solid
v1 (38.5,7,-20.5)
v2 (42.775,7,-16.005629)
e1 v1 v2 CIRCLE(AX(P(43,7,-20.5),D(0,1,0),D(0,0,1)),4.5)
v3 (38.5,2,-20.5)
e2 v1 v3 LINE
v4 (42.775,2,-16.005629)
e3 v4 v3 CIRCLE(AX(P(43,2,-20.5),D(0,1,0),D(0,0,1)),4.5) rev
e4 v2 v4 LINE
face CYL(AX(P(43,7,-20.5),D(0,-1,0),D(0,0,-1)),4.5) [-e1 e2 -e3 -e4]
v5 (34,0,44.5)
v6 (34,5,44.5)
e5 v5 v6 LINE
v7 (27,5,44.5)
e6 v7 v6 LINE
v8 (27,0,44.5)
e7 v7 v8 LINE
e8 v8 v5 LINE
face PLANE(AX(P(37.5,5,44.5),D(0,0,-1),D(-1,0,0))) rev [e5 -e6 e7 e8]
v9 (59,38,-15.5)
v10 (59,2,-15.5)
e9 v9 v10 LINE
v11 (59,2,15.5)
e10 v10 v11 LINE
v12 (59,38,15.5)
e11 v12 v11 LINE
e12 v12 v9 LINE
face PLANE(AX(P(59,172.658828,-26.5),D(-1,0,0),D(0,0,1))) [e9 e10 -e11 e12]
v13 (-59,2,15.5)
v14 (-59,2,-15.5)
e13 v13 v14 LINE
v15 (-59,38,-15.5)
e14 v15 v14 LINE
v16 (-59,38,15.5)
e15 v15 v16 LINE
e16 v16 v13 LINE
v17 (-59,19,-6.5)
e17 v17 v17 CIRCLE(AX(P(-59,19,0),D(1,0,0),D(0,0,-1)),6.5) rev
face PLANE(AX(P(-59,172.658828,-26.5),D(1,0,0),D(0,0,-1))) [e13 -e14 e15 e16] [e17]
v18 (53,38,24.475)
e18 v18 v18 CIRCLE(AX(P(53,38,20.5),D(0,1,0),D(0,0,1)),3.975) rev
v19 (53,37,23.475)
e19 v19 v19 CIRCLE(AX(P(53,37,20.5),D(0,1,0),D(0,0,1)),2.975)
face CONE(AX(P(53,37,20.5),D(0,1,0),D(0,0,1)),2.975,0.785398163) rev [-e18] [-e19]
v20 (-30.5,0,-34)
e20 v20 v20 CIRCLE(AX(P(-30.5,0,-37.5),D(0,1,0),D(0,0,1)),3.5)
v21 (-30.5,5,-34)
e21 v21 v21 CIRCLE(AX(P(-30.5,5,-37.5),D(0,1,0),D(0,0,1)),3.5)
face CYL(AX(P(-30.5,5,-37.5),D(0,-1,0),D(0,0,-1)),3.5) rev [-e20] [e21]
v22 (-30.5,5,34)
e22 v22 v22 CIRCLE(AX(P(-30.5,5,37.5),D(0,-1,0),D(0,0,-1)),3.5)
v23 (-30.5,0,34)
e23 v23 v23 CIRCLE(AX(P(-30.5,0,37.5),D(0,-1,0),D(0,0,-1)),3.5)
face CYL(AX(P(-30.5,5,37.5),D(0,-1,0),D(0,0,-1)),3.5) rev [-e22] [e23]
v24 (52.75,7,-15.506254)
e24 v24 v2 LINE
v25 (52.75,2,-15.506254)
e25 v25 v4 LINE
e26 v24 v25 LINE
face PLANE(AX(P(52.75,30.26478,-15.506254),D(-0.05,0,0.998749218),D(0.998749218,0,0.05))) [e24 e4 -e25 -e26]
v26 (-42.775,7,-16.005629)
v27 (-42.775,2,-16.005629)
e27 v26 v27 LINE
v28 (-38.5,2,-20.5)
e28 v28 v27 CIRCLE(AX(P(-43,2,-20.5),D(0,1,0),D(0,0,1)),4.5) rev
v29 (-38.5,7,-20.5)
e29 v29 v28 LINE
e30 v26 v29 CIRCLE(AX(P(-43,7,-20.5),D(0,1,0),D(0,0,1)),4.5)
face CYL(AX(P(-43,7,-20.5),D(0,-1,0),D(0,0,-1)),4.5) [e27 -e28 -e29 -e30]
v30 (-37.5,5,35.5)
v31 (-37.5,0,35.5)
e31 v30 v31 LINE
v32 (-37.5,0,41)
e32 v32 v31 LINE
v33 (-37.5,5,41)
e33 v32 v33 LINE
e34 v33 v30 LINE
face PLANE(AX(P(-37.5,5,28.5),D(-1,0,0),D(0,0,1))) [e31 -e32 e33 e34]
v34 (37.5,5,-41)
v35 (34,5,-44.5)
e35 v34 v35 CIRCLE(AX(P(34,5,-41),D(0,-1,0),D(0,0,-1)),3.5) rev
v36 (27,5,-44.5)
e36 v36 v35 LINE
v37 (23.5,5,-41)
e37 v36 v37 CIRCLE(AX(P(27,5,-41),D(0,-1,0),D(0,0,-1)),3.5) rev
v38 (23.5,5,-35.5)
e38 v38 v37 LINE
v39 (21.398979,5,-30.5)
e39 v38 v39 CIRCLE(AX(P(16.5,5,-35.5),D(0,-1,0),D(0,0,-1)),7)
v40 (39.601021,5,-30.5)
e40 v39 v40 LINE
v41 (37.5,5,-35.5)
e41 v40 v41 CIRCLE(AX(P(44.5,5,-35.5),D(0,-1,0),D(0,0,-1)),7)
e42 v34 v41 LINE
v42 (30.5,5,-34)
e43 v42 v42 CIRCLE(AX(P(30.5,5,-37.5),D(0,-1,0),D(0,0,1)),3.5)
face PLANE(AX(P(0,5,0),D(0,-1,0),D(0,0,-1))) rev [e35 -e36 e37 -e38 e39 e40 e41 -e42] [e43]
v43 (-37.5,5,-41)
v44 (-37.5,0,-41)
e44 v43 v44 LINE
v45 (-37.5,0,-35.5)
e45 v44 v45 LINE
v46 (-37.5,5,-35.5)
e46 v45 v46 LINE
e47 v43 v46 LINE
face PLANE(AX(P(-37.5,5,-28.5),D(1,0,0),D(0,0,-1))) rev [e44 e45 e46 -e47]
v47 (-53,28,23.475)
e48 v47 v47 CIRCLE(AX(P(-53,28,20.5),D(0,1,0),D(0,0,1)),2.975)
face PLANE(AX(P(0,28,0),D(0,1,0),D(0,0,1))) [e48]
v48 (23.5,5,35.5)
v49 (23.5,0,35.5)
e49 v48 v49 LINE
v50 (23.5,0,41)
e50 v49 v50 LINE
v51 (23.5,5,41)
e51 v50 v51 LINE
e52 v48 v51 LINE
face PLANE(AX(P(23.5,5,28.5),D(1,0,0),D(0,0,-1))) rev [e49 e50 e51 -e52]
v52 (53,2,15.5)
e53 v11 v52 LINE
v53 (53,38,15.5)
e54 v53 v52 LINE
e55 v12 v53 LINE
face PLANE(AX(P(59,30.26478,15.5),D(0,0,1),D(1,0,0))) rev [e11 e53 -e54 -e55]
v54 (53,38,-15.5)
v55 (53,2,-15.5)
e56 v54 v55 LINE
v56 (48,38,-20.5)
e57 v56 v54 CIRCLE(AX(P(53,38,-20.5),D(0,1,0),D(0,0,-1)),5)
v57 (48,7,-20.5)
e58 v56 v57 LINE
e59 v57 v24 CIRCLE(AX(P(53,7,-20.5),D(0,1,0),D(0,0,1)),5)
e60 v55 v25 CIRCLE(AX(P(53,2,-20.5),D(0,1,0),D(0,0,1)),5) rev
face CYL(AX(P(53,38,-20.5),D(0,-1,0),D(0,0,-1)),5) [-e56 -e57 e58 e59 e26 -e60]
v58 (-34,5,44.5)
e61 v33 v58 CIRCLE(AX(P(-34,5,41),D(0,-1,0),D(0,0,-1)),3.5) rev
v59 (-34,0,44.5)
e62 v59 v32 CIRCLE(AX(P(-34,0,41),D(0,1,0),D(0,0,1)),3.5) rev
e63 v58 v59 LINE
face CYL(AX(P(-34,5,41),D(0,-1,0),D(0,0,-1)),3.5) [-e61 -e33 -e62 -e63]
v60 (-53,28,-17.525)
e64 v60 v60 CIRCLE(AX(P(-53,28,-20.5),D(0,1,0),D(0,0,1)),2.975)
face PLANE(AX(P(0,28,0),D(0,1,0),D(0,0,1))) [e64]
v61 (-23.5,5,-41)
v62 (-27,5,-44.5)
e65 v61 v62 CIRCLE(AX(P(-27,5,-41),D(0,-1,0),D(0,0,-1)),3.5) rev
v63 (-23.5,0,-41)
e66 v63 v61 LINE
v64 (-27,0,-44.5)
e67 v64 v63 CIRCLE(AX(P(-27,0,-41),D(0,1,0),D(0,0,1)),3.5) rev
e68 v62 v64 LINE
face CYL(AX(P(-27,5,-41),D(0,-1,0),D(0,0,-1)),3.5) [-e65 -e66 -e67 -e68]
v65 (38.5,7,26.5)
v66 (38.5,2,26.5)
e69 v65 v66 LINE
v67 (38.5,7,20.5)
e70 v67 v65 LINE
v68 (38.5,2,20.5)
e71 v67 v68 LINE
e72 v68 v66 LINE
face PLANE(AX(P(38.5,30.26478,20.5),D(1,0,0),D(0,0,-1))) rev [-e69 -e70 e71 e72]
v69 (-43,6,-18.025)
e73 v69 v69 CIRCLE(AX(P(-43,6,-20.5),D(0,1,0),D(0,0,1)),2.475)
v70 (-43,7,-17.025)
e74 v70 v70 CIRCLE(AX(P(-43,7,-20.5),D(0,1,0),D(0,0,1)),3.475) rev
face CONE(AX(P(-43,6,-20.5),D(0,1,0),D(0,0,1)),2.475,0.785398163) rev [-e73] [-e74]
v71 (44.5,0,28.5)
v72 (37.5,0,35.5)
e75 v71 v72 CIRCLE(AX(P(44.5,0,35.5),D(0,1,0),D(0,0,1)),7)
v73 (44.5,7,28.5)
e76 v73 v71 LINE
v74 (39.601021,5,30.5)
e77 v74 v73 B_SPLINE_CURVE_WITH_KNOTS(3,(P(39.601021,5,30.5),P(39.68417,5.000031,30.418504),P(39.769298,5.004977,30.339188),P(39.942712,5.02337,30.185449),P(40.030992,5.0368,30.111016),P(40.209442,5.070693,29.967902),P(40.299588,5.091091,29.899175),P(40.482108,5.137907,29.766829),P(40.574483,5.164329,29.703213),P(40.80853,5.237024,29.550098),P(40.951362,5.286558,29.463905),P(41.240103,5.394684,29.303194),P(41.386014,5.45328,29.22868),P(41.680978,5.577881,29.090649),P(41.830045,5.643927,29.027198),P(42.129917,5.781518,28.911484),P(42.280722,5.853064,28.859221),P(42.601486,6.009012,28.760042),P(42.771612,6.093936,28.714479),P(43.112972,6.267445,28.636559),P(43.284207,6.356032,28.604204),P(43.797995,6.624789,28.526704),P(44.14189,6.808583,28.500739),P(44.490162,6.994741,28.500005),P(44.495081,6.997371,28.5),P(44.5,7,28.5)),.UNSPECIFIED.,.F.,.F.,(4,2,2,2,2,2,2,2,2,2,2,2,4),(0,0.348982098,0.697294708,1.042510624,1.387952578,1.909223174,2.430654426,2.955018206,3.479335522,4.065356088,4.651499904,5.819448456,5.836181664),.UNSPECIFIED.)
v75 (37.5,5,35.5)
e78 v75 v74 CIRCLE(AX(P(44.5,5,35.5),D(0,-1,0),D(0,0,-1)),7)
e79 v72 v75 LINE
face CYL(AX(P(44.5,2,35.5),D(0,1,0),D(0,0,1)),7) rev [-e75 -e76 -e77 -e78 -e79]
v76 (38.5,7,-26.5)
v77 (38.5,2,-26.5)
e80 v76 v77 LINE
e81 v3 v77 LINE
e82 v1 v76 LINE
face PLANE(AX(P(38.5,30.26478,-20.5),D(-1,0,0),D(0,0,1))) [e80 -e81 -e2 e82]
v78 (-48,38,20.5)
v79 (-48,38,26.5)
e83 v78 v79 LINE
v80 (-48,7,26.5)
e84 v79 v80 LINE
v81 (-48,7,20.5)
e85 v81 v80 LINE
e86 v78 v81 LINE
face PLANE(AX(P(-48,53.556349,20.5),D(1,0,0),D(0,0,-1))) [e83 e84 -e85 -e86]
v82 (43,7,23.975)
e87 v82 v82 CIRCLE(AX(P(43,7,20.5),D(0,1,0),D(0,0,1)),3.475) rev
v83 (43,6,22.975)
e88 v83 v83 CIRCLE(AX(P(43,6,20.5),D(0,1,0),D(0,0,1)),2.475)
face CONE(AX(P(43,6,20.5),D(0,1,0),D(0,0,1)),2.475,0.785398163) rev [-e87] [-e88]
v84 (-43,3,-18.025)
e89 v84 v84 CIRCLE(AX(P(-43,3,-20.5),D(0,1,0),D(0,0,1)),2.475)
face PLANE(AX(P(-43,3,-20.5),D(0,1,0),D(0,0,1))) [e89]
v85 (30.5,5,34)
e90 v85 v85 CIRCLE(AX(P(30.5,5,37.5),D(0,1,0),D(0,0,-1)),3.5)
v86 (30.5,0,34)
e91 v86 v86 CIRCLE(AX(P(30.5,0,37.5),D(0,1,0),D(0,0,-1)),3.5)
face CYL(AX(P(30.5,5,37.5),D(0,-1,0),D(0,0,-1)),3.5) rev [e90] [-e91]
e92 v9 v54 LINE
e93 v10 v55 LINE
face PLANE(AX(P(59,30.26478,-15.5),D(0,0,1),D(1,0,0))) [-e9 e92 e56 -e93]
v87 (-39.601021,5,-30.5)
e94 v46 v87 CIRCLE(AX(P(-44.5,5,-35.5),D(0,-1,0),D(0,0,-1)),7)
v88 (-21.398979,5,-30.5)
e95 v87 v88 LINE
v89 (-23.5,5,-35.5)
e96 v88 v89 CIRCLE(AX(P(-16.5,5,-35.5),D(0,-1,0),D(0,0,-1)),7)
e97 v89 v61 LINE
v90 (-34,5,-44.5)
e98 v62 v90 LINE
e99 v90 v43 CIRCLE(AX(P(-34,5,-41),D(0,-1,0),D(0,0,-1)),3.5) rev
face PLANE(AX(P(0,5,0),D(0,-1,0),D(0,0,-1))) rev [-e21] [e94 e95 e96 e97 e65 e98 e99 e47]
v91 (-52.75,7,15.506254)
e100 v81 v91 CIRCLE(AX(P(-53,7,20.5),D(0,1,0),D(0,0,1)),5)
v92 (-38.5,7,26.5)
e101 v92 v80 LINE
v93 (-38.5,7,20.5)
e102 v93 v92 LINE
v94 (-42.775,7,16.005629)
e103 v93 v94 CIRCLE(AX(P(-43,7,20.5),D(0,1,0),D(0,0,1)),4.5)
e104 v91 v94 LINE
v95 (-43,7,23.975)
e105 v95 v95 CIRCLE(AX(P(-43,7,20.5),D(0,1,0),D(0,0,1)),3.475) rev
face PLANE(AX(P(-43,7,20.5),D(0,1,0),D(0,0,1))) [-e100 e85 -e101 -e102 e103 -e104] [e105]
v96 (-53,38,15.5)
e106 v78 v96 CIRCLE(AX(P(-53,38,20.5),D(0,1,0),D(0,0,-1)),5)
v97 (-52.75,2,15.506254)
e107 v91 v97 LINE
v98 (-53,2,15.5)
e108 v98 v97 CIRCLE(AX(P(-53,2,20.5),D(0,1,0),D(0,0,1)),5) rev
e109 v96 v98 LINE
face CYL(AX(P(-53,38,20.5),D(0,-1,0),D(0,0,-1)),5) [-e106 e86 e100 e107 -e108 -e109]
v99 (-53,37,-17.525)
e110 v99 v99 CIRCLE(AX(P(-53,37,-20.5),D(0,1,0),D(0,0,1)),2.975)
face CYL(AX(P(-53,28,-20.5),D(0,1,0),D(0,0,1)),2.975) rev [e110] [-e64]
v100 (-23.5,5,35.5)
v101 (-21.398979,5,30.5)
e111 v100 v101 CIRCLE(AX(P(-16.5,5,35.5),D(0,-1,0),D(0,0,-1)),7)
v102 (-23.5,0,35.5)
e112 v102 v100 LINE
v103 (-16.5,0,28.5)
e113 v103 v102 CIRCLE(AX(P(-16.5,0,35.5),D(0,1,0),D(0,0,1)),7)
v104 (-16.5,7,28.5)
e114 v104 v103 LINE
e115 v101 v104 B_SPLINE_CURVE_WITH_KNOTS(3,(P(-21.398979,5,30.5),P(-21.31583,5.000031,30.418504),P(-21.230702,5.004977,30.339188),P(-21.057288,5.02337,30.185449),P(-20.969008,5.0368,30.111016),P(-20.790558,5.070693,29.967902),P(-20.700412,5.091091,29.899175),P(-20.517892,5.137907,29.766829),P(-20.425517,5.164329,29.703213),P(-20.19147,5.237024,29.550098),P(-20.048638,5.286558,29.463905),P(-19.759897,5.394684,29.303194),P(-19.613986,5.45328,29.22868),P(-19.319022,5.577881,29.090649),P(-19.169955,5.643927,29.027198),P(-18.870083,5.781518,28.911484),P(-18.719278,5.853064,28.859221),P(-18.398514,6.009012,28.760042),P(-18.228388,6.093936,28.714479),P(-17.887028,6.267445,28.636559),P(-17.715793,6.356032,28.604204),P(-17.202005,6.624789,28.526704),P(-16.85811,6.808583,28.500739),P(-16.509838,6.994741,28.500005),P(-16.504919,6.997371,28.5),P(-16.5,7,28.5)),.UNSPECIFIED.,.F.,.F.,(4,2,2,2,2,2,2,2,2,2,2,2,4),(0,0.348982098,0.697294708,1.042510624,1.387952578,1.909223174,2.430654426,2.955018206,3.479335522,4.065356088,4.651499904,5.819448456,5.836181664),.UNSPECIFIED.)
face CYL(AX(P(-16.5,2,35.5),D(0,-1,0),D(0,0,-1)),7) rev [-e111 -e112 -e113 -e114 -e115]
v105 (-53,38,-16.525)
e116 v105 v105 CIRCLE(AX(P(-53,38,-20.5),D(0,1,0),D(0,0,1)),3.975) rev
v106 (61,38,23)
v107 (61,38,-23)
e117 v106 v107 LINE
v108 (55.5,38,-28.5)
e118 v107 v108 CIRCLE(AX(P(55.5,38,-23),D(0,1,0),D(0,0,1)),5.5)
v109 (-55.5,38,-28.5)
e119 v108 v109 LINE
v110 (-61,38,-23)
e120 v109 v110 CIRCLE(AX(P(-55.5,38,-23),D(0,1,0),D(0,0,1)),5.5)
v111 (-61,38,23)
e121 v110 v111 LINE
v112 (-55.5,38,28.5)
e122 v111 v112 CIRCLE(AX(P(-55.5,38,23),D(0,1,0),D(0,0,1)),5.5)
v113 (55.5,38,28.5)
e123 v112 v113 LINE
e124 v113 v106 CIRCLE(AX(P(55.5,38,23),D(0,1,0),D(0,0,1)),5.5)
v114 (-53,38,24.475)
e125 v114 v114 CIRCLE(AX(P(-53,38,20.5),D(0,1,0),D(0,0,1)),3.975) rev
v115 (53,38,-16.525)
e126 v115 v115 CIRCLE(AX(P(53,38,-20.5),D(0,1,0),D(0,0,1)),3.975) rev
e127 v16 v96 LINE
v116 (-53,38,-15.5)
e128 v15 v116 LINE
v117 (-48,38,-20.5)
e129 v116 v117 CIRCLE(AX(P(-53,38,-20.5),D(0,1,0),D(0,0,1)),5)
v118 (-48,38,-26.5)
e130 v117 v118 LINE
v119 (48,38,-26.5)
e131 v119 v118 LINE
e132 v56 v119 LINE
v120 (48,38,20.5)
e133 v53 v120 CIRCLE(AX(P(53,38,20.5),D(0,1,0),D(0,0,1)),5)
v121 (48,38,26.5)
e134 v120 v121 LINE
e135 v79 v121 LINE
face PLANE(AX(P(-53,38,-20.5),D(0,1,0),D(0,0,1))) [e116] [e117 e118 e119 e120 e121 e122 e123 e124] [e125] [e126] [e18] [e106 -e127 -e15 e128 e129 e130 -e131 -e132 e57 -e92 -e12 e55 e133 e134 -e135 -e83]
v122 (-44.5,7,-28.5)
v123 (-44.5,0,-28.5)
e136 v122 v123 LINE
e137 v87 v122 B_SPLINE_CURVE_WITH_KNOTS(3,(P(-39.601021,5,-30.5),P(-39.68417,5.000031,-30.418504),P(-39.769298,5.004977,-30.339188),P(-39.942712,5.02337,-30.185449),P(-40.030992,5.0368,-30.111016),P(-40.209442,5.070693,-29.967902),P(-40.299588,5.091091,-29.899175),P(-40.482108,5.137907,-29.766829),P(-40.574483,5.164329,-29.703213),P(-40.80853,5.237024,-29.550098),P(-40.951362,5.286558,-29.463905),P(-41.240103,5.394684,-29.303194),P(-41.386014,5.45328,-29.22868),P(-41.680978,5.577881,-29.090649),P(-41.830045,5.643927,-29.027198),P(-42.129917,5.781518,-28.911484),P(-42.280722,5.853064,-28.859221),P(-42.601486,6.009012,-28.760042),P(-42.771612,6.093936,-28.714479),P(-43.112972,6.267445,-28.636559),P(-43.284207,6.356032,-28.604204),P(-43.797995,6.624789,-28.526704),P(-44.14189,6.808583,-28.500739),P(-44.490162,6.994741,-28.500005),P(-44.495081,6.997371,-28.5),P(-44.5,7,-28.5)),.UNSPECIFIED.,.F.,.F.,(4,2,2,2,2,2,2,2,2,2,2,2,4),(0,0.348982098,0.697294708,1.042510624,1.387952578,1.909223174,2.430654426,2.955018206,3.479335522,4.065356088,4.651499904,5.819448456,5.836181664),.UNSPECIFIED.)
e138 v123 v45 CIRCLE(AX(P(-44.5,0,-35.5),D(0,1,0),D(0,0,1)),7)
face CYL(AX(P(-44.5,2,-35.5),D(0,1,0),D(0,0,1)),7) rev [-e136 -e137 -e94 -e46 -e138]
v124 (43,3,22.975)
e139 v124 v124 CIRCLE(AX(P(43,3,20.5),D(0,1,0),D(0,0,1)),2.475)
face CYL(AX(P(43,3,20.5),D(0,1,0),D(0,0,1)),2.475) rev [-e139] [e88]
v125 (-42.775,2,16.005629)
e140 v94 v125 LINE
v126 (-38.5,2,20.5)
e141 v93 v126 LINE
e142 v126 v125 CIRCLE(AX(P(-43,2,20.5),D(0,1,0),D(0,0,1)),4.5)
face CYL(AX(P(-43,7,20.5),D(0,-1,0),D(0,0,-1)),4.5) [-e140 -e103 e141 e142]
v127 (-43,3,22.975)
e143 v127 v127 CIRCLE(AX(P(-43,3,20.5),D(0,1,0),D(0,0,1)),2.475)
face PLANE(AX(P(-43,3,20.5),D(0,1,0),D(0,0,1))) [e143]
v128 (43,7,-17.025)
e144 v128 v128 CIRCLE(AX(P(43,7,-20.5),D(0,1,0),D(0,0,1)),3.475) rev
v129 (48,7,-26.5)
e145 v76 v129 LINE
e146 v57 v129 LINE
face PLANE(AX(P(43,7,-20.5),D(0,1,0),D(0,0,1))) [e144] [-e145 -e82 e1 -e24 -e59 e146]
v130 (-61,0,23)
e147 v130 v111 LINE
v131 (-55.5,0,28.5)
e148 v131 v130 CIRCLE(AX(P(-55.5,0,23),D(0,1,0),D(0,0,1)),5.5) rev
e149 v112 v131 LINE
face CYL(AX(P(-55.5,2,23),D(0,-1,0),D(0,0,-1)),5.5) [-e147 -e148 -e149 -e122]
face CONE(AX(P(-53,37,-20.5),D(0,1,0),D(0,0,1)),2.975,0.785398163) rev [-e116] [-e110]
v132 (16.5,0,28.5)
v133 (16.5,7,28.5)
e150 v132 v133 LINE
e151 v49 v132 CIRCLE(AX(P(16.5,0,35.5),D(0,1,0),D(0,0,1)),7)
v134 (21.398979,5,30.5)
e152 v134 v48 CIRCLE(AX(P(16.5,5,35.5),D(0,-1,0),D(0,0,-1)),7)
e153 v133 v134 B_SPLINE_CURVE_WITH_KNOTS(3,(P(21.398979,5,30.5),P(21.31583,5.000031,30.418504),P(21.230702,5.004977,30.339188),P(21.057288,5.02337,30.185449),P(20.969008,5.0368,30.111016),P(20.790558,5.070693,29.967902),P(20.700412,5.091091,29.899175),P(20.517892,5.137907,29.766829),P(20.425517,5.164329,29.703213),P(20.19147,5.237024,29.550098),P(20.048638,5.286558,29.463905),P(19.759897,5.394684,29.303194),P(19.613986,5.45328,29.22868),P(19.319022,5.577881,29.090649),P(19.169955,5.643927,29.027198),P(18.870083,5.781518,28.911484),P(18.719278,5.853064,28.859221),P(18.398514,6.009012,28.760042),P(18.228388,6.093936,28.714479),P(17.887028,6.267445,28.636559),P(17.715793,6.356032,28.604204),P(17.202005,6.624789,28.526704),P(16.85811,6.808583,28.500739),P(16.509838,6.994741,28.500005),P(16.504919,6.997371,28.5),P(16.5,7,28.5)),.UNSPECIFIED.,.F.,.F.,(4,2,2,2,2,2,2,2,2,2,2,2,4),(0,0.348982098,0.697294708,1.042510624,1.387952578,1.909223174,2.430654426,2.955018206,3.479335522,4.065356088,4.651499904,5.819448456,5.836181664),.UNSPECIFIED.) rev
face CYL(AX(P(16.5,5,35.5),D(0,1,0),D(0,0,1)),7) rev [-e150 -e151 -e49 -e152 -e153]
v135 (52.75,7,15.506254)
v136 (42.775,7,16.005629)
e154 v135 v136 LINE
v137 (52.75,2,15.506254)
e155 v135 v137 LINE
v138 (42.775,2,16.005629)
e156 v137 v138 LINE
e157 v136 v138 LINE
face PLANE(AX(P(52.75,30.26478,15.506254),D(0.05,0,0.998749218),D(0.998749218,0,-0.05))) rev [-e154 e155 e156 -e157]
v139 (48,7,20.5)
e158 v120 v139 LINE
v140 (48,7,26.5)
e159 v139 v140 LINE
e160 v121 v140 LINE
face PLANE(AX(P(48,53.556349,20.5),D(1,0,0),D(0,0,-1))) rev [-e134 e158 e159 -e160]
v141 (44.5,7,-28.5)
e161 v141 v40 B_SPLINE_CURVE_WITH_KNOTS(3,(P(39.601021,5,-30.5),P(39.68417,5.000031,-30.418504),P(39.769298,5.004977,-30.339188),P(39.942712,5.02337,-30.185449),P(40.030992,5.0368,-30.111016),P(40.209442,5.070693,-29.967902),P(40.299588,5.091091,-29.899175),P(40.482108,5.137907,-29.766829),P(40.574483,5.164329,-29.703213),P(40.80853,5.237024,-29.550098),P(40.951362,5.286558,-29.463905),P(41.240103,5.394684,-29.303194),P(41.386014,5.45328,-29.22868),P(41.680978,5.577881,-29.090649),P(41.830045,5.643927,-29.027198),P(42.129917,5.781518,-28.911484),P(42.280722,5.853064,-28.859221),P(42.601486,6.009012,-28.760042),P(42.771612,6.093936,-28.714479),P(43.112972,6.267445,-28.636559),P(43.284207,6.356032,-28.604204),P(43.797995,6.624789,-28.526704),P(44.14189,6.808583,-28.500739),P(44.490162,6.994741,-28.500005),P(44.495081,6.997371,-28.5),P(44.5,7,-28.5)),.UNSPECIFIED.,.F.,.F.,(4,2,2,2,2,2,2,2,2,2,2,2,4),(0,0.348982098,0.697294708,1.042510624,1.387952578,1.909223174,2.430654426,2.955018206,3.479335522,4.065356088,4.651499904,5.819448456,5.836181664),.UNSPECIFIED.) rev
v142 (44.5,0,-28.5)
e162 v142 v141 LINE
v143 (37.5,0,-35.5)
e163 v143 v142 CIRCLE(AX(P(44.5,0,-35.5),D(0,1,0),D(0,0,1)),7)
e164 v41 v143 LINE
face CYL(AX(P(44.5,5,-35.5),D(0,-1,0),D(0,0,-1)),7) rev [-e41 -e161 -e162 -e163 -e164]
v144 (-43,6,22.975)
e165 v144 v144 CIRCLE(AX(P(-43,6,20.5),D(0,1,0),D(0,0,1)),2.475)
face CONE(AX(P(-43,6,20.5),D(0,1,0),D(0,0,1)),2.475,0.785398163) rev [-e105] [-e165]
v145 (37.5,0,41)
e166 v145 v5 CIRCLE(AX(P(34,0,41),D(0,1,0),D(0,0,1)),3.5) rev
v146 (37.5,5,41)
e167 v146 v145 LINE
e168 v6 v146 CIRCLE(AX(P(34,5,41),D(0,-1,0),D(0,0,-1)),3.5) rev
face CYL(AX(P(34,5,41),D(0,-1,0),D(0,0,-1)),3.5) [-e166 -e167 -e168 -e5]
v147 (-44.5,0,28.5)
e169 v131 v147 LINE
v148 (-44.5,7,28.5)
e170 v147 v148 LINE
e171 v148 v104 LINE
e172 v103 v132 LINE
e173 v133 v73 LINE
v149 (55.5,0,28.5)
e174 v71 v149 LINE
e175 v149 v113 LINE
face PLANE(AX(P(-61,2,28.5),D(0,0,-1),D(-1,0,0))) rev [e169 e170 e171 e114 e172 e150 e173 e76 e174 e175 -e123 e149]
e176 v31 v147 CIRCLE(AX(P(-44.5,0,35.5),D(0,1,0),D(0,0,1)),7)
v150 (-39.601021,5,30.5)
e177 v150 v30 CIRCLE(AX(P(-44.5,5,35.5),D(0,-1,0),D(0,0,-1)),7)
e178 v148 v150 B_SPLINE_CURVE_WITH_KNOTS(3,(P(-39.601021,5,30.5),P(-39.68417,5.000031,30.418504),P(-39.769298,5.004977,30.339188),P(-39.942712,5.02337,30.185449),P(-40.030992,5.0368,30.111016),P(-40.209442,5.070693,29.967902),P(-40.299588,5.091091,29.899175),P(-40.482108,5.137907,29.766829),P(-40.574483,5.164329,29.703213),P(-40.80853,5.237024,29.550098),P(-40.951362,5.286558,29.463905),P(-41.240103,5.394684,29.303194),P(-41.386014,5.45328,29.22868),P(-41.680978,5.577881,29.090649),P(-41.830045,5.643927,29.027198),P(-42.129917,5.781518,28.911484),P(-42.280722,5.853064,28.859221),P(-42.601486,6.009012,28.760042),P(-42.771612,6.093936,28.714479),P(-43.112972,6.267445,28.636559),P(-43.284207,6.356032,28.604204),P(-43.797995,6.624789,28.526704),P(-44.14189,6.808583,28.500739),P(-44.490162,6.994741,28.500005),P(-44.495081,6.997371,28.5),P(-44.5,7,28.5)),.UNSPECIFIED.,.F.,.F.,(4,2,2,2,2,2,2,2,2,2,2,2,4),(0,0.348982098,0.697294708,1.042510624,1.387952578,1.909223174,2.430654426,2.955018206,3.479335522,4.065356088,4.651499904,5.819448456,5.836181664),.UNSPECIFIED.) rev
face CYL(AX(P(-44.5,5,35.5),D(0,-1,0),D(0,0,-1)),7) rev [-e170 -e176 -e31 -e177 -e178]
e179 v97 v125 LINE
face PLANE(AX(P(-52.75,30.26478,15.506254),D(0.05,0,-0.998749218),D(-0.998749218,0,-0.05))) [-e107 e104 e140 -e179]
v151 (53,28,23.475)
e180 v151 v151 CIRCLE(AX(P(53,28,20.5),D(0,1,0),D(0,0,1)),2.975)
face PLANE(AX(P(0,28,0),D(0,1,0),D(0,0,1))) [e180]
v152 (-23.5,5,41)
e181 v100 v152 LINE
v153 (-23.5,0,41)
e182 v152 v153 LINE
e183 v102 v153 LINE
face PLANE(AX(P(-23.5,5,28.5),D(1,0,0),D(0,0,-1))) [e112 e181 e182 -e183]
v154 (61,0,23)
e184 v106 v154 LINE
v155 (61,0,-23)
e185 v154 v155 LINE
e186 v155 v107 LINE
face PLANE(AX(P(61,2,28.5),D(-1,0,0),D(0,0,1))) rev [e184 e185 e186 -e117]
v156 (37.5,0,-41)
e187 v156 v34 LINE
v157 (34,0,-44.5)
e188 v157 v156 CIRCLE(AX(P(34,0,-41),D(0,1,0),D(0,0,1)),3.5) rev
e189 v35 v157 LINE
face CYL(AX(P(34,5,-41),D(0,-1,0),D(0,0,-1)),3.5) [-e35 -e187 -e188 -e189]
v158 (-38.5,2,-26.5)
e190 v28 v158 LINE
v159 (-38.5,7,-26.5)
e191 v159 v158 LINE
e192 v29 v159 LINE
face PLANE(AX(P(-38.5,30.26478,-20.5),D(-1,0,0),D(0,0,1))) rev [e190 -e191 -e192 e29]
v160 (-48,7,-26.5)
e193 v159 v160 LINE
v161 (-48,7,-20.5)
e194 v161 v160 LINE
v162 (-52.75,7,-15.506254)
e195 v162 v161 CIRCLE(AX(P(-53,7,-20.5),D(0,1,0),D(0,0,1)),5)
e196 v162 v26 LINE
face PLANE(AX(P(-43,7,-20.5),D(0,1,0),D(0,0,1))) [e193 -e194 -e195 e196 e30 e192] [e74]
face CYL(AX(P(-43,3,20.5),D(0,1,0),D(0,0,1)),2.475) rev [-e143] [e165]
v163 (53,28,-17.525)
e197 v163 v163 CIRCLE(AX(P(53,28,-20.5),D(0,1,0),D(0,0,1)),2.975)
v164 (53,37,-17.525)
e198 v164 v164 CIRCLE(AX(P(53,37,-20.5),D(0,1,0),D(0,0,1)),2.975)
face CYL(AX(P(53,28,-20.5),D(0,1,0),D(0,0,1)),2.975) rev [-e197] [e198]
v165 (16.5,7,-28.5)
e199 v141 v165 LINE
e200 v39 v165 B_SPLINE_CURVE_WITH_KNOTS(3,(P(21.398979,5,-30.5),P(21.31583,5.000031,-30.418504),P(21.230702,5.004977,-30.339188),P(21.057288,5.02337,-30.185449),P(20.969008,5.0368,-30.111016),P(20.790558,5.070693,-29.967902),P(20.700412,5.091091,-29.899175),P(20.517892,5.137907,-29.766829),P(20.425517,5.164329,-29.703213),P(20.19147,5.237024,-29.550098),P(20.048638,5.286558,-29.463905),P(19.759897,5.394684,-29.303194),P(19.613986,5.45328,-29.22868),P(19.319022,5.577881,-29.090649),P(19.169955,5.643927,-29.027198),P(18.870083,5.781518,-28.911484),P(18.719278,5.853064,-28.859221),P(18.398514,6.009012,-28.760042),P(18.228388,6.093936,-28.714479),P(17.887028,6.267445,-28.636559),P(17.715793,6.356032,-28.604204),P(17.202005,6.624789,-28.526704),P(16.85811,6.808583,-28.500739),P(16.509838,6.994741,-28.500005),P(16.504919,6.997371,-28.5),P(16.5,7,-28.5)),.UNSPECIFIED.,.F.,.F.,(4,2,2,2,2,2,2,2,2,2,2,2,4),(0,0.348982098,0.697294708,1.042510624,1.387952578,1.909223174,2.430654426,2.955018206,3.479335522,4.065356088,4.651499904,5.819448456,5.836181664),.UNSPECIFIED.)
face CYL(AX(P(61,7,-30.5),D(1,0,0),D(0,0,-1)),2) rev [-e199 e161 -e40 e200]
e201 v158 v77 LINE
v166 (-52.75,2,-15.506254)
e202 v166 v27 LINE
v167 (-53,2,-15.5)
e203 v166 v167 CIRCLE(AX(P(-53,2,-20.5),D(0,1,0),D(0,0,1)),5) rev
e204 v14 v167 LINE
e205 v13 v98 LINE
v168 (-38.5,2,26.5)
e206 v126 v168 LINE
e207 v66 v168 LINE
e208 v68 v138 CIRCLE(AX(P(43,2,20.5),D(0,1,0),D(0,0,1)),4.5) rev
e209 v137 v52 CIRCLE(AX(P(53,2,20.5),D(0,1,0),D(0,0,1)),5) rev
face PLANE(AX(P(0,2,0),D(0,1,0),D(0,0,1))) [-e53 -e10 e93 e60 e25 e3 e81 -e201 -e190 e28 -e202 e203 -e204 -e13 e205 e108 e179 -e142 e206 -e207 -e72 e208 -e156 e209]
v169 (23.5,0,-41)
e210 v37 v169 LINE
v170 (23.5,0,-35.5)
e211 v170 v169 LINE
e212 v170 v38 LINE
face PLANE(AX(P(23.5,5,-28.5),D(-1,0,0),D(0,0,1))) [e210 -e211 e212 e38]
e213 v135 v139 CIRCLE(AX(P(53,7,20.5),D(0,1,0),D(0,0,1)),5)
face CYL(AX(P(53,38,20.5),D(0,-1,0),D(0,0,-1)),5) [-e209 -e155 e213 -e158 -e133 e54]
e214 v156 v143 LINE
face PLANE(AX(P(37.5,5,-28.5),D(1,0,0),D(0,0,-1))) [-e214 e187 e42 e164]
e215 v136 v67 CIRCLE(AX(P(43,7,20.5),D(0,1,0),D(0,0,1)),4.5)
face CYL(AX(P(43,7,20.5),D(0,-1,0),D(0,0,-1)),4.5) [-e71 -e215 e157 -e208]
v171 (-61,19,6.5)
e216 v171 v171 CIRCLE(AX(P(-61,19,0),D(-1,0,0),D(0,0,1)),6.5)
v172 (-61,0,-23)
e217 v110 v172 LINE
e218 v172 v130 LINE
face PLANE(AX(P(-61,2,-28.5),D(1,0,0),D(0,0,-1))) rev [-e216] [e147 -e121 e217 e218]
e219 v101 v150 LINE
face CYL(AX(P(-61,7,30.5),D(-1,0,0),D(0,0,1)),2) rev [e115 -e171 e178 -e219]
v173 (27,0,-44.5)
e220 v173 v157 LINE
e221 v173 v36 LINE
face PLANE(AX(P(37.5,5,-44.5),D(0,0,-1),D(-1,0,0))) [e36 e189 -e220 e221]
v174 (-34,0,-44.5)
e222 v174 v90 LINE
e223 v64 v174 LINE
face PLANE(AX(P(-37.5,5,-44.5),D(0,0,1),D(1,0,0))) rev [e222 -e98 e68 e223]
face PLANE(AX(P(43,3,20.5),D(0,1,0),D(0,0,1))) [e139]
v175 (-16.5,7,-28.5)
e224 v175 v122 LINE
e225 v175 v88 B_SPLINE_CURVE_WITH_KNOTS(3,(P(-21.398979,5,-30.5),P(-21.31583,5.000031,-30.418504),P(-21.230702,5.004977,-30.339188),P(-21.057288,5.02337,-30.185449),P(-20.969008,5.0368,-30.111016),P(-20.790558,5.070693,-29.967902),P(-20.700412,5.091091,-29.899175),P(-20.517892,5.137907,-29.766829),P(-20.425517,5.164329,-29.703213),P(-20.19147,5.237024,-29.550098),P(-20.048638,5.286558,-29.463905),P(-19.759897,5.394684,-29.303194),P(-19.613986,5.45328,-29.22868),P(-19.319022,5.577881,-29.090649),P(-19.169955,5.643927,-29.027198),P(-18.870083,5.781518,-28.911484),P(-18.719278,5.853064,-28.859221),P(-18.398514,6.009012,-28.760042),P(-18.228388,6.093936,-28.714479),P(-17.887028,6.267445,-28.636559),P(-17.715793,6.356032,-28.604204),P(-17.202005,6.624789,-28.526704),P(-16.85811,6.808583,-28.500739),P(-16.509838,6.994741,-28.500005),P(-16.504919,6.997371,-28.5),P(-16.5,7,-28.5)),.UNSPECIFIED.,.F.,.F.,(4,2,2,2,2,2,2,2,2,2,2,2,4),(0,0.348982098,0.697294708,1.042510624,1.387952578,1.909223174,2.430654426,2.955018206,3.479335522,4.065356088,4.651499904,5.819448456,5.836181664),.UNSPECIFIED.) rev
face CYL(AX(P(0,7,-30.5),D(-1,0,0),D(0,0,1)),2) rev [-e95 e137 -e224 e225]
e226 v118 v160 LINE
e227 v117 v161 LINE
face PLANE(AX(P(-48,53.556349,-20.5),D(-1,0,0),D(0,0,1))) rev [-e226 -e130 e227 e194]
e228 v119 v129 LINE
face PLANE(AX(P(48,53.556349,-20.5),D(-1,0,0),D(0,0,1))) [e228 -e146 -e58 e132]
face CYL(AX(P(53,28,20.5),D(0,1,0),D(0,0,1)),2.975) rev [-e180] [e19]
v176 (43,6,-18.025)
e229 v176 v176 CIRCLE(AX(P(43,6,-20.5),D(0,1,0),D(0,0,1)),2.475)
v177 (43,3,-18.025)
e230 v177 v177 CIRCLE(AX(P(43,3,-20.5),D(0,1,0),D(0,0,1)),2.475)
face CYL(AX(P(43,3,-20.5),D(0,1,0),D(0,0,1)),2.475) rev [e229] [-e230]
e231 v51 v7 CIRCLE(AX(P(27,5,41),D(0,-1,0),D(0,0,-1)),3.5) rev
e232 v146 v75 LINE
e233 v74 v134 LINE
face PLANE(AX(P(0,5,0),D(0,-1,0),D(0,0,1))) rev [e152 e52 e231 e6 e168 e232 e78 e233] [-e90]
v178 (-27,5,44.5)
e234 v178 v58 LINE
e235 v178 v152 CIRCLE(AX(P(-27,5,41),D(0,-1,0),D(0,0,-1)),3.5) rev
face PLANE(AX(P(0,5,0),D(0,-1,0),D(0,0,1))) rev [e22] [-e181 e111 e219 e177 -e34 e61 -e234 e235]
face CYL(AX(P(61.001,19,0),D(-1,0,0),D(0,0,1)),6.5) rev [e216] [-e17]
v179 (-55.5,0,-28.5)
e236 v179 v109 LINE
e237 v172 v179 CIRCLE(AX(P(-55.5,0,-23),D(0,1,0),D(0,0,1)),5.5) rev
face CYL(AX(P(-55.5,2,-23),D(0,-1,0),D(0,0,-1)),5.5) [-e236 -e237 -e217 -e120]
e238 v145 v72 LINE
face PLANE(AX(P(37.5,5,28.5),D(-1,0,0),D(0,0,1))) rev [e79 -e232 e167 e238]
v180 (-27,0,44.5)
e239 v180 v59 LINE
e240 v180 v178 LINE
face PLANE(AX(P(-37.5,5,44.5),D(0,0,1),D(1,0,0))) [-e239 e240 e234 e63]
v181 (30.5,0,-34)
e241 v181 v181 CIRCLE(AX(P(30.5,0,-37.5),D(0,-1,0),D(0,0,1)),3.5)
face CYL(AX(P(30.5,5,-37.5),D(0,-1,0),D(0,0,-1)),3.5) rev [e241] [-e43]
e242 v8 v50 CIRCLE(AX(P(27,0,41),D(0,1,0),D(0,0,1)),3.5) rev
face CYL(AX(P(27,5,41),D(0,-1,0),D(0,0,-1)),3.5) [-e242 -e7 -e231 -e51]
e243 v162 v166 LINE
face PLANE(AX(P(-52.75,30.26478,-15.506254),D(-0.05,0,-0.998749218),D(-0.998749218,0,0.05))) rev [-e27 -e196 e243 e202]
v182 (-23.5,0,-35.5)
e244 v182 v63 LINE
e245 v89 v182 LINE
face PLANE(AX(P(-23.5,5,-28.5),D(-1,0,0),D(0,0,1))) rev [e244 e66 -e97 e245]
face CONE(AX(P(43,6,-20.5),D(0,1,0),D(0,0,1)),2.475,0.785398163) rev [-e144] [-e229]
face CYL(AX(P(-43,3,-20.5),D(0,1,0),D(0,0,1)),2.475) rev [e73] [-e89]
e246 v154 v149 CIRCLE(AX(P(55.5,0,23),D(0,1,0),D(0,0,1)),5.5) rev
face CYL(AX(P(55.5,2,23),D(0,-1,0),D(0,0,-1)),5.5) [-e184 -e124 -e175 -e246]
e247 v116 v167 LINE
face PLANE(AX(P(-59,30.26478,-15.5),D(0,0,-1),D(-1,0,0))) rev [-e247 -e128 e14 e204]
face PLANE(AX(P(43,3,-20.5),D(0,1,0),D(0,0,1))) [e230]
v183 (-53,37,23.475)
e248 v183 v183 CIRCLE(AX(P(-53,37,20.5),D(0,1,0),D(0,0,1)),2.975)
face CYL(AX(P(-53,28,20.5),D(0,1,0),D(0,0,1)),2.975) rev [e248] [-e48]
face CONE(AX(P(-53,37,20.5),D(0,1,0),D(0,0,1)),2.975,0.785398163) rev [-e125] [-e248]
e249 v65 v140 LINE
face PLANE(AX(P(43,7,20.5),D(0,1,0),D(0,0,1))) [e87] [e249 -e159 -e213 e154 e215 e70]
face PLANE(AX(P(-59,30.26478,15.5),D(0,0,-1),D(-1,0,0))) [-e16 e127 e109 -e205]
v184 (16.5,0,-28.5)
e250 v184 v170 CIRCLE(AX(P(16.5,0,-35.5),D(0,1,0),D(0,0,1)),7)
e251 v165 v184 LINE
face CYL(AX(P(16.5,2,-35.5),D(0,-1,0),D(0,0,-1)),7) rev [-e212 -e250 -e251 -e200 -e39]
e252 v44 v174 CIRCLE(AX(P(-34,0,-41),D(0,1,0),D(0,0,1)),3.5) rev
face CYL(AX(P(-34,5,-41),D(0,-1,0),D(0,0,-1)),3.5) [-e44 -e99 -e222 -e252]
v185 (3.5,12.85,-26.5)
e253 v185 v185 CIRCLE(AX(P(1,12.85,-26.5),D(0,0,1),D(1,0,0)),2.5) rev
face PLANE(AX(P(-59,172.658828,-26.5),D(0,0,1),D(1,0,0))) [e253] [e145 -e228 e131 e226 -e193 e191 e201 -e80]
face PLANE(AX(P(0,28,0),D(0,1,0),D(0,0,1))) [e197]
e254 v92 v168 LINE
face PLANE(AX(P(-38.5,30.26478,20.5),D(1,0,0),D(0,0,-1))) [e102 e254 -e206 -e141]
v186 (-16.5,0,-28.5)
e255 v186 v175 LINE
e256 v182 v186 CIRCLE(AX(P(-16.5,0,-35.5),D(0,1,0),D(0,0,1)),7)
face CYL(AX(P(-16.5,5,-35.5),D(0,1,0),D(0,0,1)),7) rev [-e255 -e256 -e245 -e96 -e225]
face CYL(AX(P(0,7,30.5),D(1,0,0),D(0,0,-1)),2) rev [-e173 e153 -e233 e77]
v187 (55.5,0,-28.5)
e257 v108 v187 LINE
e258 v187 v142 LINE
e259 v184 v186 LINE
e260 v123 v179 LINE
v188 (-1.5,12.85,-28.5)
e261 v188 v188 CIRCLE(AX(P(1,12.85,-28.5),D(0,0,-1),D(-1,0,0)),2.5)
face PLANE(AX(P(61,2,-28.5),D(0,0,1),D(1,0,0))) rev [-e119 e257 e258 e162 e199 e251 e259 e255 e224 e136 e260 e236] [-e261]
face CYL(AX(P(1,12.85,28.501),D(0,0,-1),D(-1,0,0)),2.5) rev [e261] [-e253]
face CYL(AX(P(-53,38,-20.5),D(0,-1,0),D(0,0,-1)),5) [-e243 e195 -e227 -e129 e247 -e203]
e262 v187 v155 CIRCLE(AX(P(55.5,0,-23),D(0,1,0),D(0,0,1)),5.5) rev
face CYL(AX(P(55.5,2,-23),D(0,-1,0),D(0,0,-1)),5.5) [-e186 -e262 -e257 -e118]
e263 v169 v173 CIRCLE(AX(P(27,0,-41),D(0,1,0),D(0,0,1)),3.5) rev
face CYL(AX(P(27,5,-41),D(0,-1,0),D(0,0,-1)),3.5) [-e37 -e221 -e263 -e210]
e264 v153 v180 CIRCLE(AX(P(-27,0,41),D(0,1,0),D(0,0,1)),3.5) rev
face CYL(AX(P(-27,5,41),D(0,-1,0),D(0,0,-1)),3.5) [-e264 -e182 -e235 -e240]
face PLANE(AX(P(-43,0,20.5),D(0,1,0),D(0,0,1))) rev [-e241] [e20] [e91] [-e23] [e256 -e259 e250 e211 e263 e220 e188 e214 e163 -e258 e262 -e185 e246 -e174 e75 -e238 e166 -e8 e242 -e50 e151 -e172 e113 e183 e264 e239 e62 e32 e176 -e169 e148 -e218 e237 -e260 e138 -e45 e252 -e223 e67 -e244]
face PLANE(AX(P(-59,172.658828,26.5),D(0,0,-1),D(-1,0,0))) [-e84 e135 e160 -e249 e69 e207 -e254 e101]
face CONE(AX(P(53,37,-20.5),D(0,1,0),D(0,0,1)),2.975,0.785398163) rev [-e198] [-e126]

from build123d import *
from build123d.topology import SkipClean

# Parameters (mm, degrees)
SKETCH1_R                 = 4.5
BOSS_EXTRUDE3_DEPTH       = 7
BOSS_EXTRUDE3_2_DEPTH     = 7
BOSS_EXTRUDE3_3_DEPTH     = 7
BOSS_EXTRUDE3_4_DEPTH     = 7
SKETCH7_R                 = 2.475
CUT_EXTRUDE1_DEPTH        = 4
SKETCH8_R                 = 5
BOSS_EXTRUDE5_DEPTH       = 38
BOSS_EXTRUDE5_2_DEPTH     = 38
BOSS_EXTRUDE5_3_DEPTH     = 38
BOSS_EXTRUDE5_4_DEPTH     = 38
SKETCH9_R                 = 2.975
CUT_EXTRUDE2_DEPTH        = 10
SKETCH10_W                = 122
SKETCH10_H                = 57
SKETCH10_W_2              = 118
SKETCH10_H_2              = 53
BOSS_EXTRUDE12_DEPTH      = 38
SKETCH15_W                = 122
SKETCH15_H                = 57
BOSS_EXTRUDE14_DEPTH      = 2
FILLET2_R                 = 5.5
BOSS_EXTRUDE15_START      = 5
SKETCH16_R                = 2.475
SKETCH16_R_2              = 2.975
BOSS_EXTRUDE15_DEPTH      = 5
BOSS_EXTRUDE16_START      = 31
SKETCH17_R                = 2.975
BOSS_EXTRUDE16_DEPTH      = 31
MIRROR2_START             = 5
MIRROR2_COPY_1_SKETCH_R   = 2.475
MIRROR2_COPY_1_SKETCH_R_2 = 2.975
MIRROR2_COPY_1_DEPTH      = 5
MIRROR2_START_2           = 31
MIRROR2_COPY_2_SKETCH_R   = 2.975
MIRROR2_COPY_2_DEPTH      = 31
CUT_EXTRUDE3_REACH        = 93.728
SKETCH18_R                = 2.5
CUT_EXTRUDE4_REACH        = 132.921
SKETCH19_R                = 6.5
SKETCH20_W                = 14
SKETCH20_H                = 16
SKETCH20_R                = 3.5
BOSS_EXTRUDE17_DEPTH      = 5
MIRROR8_COPY_1_SKETCH_W   = 14
MIRROR8_COPY_1_SKETCH_H   = 16
MIRROR8_COPY_1_SKETCH_R   = 3.5
MIRROR8_COPY_1_DEPTH      = 5
FILLET3_R                 = 2
FILLET4_R                 = 7
FILLET5_R                 = 3.5
CHAMFER1_SIZE             = 1


with BuildPart() as part:
    # Sketch1 → Boss-Extrude3 (new body)
    with BuildSketch(Plane(origin=(0, 0, 0), x_dir=(1, 0, 0), z_dir=(0, 1, 0))):
        with Locations(Location((-43, 20.5, 0), (0, 0, 270))):
            Circle(SKETCH1_R)
    extrude(amount=BOSS_EXTRUDE3_DEPTH)


with BuildPart() as body_2:
    # Sketch1 → Boss-Extrude3 2 (new body)
    with BuildSketch(Plane(origin=(0, 0, 0), x_dir=(1, 0, 0), z_dir=(0, 1, 0))):
        with Locations(Location((43, 20.5, 0), (0, 0, 270))):
            Circle(SKETCH1_R)
    extrude(amount=BOSS_EXTRUDE3_2_DEPTH)


with BuildPart() as body_3:
    # Sketch1 → Boss-Extrude3 3 (new body)
    with BuildSketch(Plane(origin=(0, 0, 0), x_dir=(1, 0, 0), z_dir=(0, 1, 0))):
        with Locations(Location((43, -20.5, 0), (0, 0, 270))):
            Circle(SKETCH1_R)
    extrude(amount=BOSS_EXTRUDE3_3_DEPTH)


with BuildPart() as body_4:
    # Sketch1 → Boss-Extrude3 4 (new body)
    with BuildSketch(Plane(origin=(0, 0, 0), x_dir=(1, 0, 0), z_dir=(0, 1, 0))):
        with Locations(Location((-43, -20.5, 0), (0, 0, 270))):
            Circle(SKETCH1_R)
    extrude(amount=BOSS_EXTRUDE3_4_DEPTH)


with BuildPart() as cut_extrude1_tool:
    # Sketch7 → Cut-Extrude1 (new body)
    with BuildSketch(Plane(origin=(0, 7, 0), x_dir=(1, 0, 0), z_dir=(0, 1, 0))):
        with Locations(Location((-43, 20.5, 0), (0, 0, 270))):
            Circle(SKETCH7_R)
        with Locations(Location((43, 20.5, 0), (0, 0, 270))):
            Circle(SKETCH7_R)
        with Locations(Location((43, -20.5, 0), (0, 0, 270))):
            Circle(SKETCH7_R)
        with Locations(Location((-43, -20.5, 0), (0, 0, 270))):
            Circle(SKETCH7_R)
    extrude(amount=-CUT_EXTRUDE1_DEPTH)


with BuildPart() as part_1:
    add(part.part)

    # Cut-Extrude1: cut by cut_extrude1_tool
    add(cut_extrude1_tool.part, mode=Mode.SUBTRACT)



with BuildPart() as body_2_1:
    add(body_2.part)

    # Cut-Extrude1: cut by cut_extrude1_tool
    add(cut_extrude1_tool.part, mode=Mode.SUBTRACT)


with BuildPart() as body_3_1:
    add(body_3.part)

    # Cut-Extrude1: cut by cut_extrude1_tool
    add(cut_extrude1_tool.part, mode=Mode.SUBTRACT)


with BuildPart() as body_4_1:
    add(body_4.part)

    # Cut-Extrude1: cut by cut_extrude1_tool
    add(cut_extrude1_tool.part, mode=Mode.SUBTRACT)


with BuildPart() as body_5:
    # Sketch8 → Boss-Extrude5 (new body)
    with BuildSketch(Plane(origin=(0, 0, 0), x_dir=(1, 0, 0), z_dir=(0, 1, 0))):
        with Locations(Location((-53, 20.5, 0), (0, 0, 270))):
            Circle(SKETCH8_R)
    extrude(amount=BOSS_EXTRUDE5_DEPTH)


with BuildPart() as body_6:
    # Sketch8 → Boss-Extrude5 2 (new body)
    with BuildSketch(Plane(origin=(0, 0, 0), x_dir=(1, 0, 0), z_dir=(0, 1, 0))):
        with Locations(Location((-53, -20.5, 0), (0, 0, 90))):
            Circle(SKETCH8_R)
    extrude(amount=BOSS_EXTRUDE5_2_DEPTH)


with BuildPart() as body_7:
    # Sketch8 → Boss-Extrude5 3 (new body)
    with BuildSketch(Plane(origin=(0, 0, 0), x_dir=(1, 0, 0), z_dir=(0, 1, 0))):
        with Locations(Location((53, -20.5, 0), (0, 0, 270))):
            Circle(SKETCH8_R)
    extrude(amount=BOSS_EXTRUDE5_3_DEPTH)


with BuildPart() as body_8:
    # Sketch8 → Boss-Extrude5 4 (new body)
    with BuildSketch(Plane(origin=(0, 0, 0), x_dir=(1, 0, 0), z_dir=(0, 1, 0))):
        with Locations(Location((53, 20.5, 0), (0, 0, 90))):
            Circle(SKETCH8_R)
    extrude(amount=BOSS_EXTRUDE5_4_DEPTH)


with BuildPart() as cut_extrude2_tool:
    # Sketch9 → Cut-Extrude2 (new body)
    with BuildSketch(Plane(origin=(0, 38, 0), x_dir=(1, 0, 0), z_dir=(0, 1, 0))):
        with Locations(Location((-53, 20.5, 0), (0, 0, 270))):
            Circle(SKETCH9_R)
        with Locations(Location((-53, -20.5, 0), (0, 0, 270))):
            Circle(SKETCH9_R)
        with Locations(Location((53, 20.5, 0), (0, 0, 270))):
            Circle(SKETCH9_R)
        with Locations(Location((53, -20.5, 0), (0, 0, 270))):
            Circle(SKETCH9_R)
    extrude(amount=-CUT_EXTRUDE2_DEPTH)


with BuildPart() as body_5_1:
    add(body_5.part)

    # Cut-Extrude2: cut by cut_extrude2_tool
    add(cut_extrude2_tool.part, mode=Mode.SUBTRACT)


with BuildPart() as body_6_1:
    add(body_6.part)

    # Cut-Extrude2: cut by cut_extrude2_tool
    add(cut_extrude2_tool.part, mode=Mode.SUBTRACT)


with BuildPart() as body_7_1:
    add(body_7.part)

    # Cut-Extrude2: cut by cut_extrude2_tool
    add(cut_extrude2_tool.part, mode=Mode.SUBTRACT)


with BuildPart() as body_8_1:
    add(body_8.part)

    # Cut-Extrude2: cut by cut_extrude2_tool
    add(cut_extrude2_tool.part, mode=Mode.SUBTRACT)


with BuildPart() as body_9:
    # Sketch10 → Boss-Extrude12 (new body)
    with BuildSketch(Plane(origin=(0, 0, 0), x_dir=(1, 0, 0), z_dir=(0, 1, 0))):
        Rectangle(SKETCH10_W, SKETCH10_H)
        Rectangle(SKETCH10_W_2, SKETCH10_H_2, mode=Mode.SUBTRACT)
    extrude(amount=BOSS_EXTRUDE12_DEPTH)


with BuildPart() as part_2:
    add(part_1.part)

    add(body_2_1.part)  # Boss-Extrude14 merges body 2

    add(body_3_1.part)  # Boss-Extrude14 merges body 3

    add(body_4_1.part)  # Boss-Extrude14 merges body 4

    add(body_5_1.part)  # Boss-Extrude14 merges body 5

    add(body_6_1.part)  # Boss-Extrude14 merges body 6

    add(body_7_1.part)  # Boss-Extrude14 merges body 7

    add(body_8_1.part)  # Boss-Extrude14 merges body 8

    add(body_9.part)  # Boss-Extrude14 merges body 9
    # Sketch15 → Boss-Extrude14 (add)
    with BuildSketch(Plane(origin=(0, 0, 0), x_dir=(1, 0, 0), z_dir=(0, 1, 0))):
        Rectangle(SKETCH15_W, SKETCH15_H)
    extrude(amount=BOSS_EXTRUDE14_DEPTH)

    # Fillet2
    fillet2_edges = [part_2.edges().sort_by_distance(p)[0] for p in [
        (-61, 19, 28.5),
        (61, 19, 28.5),
        (61, 19, -28.5),
        (-61, 19, -28.5),
        (-59, 20, -26.5),
        (59, 20, -26.5),
        (59, 20, 26.5),
        (-59, 20, 26.5),
    ]]
    fillet(fillet2_edges, radius=FILLET2_R)

    # Sketch16 → Boss-Extrude15 (add)
    with BuildSketch(Plane(origin=(0, 2, 0), x_dir=(1, 0, 0), z_dir=(0, 1, 0)).offset(BOSS_EXTRUDE15_START)):
        with BuildLine():
            Line((-59, 15.5), (-59, 21))
            ThreePointArc((-59, 21), (-57.389087297, 24.889087297), (-53.5, 26.5))
            Line((-53.5, 26.5), (-38.5, 26.5))
            Line((-38.5, 26.5), (-38.5, 20.5))
            ThreePointArc((-38.5, 20.5), (-39.739440232, 17.398589031), (-42.775, 16.00562852))
            Line((-42.775, 16.00562852), (-52.75, 15.506253911))
            ThreePointArc((-52.75, 15.506253911), (-52.874960895, 15.501563722), (-53, 15.5))
            Line((-53, 15.5), (-59, 15.5))
        make_face()
        with Locations(Location((-43, 20.5, 0), (0, 0, 270))):
            Circle(SKETCH16_R, mode=Mode.SUBTRACT)
        with Locations(Location((-53, 20.5, 0), (0, 0, 270))):
            Circle(SKETCH16_R_2, mode=Mode.SUBTRACT)
    boss_extrude15 = extrude(amount=-BOSS_EXTRUDE15_DEPTH)

    # Sketch17 → Boss-Extrude16 (add)
    with BuildSketch(Plane(origin=(0, 7, 0), x_dir=(1, 0, 0), z_dir=(0, 1, 0)).offset(BOSS_EXTRUDE16_START)):
        with BuildLine():
            Line((-59, 15.5), (-53, 15.5))
            ThreePointArc((-53, 15.5), (-49.464466094, 16.964466094), (-48, 20.5))
            Line((-48, 20.5), (-48, 26.5))
            Line((-48, 26.5), (-53.5, 26.5))
            ThreePointArc((-53.5, 26.5), (-57.389087297, 24.889087297), (-59, 21))
            Line((-59, 21), (-59, 15.5))
        make_face()
        with Locations(Location((-53, 20.5, 0), (0, 0, 270))):
            Circle(SKETCH17_R, mode=Mode.SUBTRACT)
    boss_extrude16 = extrude(amount=-BOSS_EXTRUDE16_DEPTH)

    # Mirror1: Boss-Extrude15, Boss-Extrude16 across plane
    with SkipClean():  # the faces are left unmerged after this step: merging them gives an invalid solid
        add(boss_extrude15.mirror(Plane(origin=(0, 0, 0), x_dir=(0, 0, 1), z_dir=(1, 0, 0))))
        add(boss_extrude16.mirror(Plane(origin=(0, 0, 0), x_dir=(0, 0, 1), z_dir=(1, 0, 0))))

    # Mirror2: Boss-Extrude15, Boss-Extrude16 across plane
    with SkipClean():  # the faces are left unmerged after this step: merging them gives an invalid solid
        add(boss_extrude15.mirror(Plane.XY))
        add(boss_extrude16.mirror(Plane.XY))

    # Mirror2 copy 1 sketch → Mirror2 copy 1 (add)
    with SkipClean():  # the faces are left unmerged after this step: merging them gives an invalid solid
        with BuildSketch(Plane(origin=(0, 2, 0), x_dir=(-1, 0, 0), z_dir=(0, 1, 0)).offset(MIRROR2_START)):
            with BuildLine():
                Line((-59, 15.5), (-59, 21))
                ThreePointArc((-59, 21), (-57.389087297, 24.889087297), (-53.5, 26.5))
                Line((-53.5, 26.5), (-38.5, 26.5))
                Line((-38.5, 26.5), (-38.5, 20.5))
                ThreePointArc((-38.5, 20.5), (-39.739440232, 17.398589031), (-42.775, 16.00562852))
                Line((-42.775, 16.00562852), (-52.75, 15.506253911))
                ThreePointArc((-52.75, 15.506253911), (-52.874960895, 15.501563722), (-53, 15.5))
                Line((-53, 15.5), (-59, 15.5))
            make_face()
            with Locations(Location((-43, 20.5, 0), (0, 0, 270))):
                Circle(MIRROR2_COPY_1_SKETCH_R, mode=Mode.SUBTRACT)
            with Locations(Location((-53, 20.5, 0), (0, 0, 270))):
                Circle(MIRROR2_COPY_1_SKETCH_R_2, mode=Mode.SUBTRACT)
        extrude(amount=-MIRROR2_COPY_1_DEPTH)

    # Mirror2 copy 2 sketch → Mirror2 copy 2 (add)
    with SkipClean():  # the faces are left unmerged after this step: merging them gives an invalid solid
        with BuildSketch(Plane(origin=(0, 7, 0), x_dir=(-1, 0, 0), z_dir=(0, 1, 0)).offset(MIRROR2_START_2)):
            with BuildLine():
                Line((-59, 15.5), (-53, 15.5))
                ThreePointArc((-53, 15.5), (-49.464466094, 16.964466094), (-48, 20.5))
                Line((-48, 20.5), (-48, 26.5))
                Line((-48, 26.5), (-53.5, 26.5))
                ThreePointArc((-53.5, 26.5), (-57.389087297, 24.889087297), (-59, 21))
                Line((-59, 21), (-59, 15.5))
            make_face()
            with Locations(Location((-53, 20.5, 0), (0, 0, 270))):
                Circle(MIRROR2_COPY_2_SKETCH_R, mode=Mode.SUBTRACT)
        extrude(amount=-MIRROR2_COPY_2_DEPTH)

    # Sketch18 → Cut-Extrude3 (cut, up to next)
    with BuildSketch(Plane(origin=(0, 0, -28.5), x_dir=(-1, 0, 0), z_dir=(0, 0, -1)), mode=Mode.PRIVATE) as cut_extrude3_sk1:
        with Locations((-1, 12.85)):
            Circle(SKETCH18_R)
    cut_extrude3_tool1 = extrude(cut_extrude3_sk1.sketch, amount=-CUT_EXTRUDE3_REACH, mode=Mode.PRIVATE) & part_2.part
    add(cut_extrude3_tool1.solids().sort_by_distance((1, 12.85, -28.5))[0], mode=Mode.SUBTRACT)

    # Sketch19 → Cut-Extrude4 (cut, up to next)
    with BuildSketch(Plane.ZY.offset(61), mode=Mode.PRIVATE) as cut_extrude4_sk1:
        with Locations((0, 19)):
            Circle(SKETCH19_R)
    cut_extrude4_tool1 = extrude(cut_extrude4_sk1.sketch, amount=-CUT_EXTRUDE4_REACH, mode=Mode.PRIVATE) & part_2.part
    add(cut_extrude4_tool1.solids().sort_by_distance((-61, 19, 0))[0], mode=Mode.SUBTRACT)

    # Sketch20 → Boss-Extrude17 (add)
    with SkipClean():  # the faces are left unmerged after this step: merging them gives an invalid solid
        with BuildSketch(Plane(origin=(0, 0, 0), x_dir=(1, 0, 0), z_dir=(0, 1, 0))):
            with Locations((-30.5, 36.5)):
                Rectangle(SKETCH20_W, SKETCH20_H)
            with Locations(Location((-30.5, 37.5, 0), (0, 0, 270))):
                Circle(SKETCH20_R, mode=Mode.SUBTRACT)
        boss_extrude17 = extrude(amount=BOSS_EXTRUDE17_DEPTH)

    # Mirror6: Boss-Extrude17 across plane
    with SkipClean():  # the faces are left unmerged after this step: merging them gives an invalid solid
        add(boss_extrude17.mirror(Plane.XY))

    # Mirror8: Boss-Extrude17 across plane
    with SkipClean():  # the faces are left unmerged after this step: merging them gives an invalid solid
        add(boss_extrude17.mirror(Plane(origin=(0, 0, 0), x_dir=(0, 0, 1), z_dir=(1, 0, 0))))

    # Mirror8 copy 1 sketch → Mirror8 copy 1 (add)
    with SkipClean():  # the faces are left unmerged after this step: merging them gives an invalid solid
        with BuildSketch(Plane(origin=(0, 0, 0), x_dir=(-1, 0, 0), z_dir=(0, 1, 0))):
            with Locations((-30.5, 36.5)):
                Rectangle(MIRROR8_COPY_1_SKETCH_W, MIRROR8_COPY_1_SKETCH_H)
            with Locations(Location((-30.5, 37.5, 0), (0, 0, 270))):
                Circle(MIRROR8_COPY_1_SKETCH_R, mode=Mode.SUBTRACT)
        extrude(amount=MIRROR8_COPY_1_DEPTH)

    # Fillet3
    fillet3_edges = [part_2.edges().sort_by_distance(p)[0] for p in [
        (-30.5, 5, -28.5),
        (-30.5, 5, 28.5),
        (30.5, 5, 28.5),
        (30.5, 5, -28.5),
    ]]
    fillet(fillet3_edges, radius=FILLET3_R)

    # Fillet4
    fillet4_edges = [part_2.edges().sort_by_distance(p)[0] for p in [
        (-37.5, 6, -28.5),
        (-37.5, 2.5, -28.5),
    ]]
    fillet(fillet4_edges, radius=FILLET4_R)
    fillet4_2_edges = [part_2.edges().sort_by_distance(p)[0] for p in [
        (-23.5, 6, -28.5),
        (-23.5, 2.5, -28.5),
    ]]
    fillet(fillet4_2_edges, radius=FILLET4_R)
    fillet4_3_edges = [part_2.edges().sort_by_distance(p)[0] for p in [
        (23.5, 2.5, -28.5),
        (23.5, 6, -28.5),
    ]]
    fillet(fillet4_3_edges, radius=FILLET4_R)
    fillet4_4_edges = [part_2.edges().sort_by_distance(p)[0] for p in [
        (37.5, 2.5, -28.5),
        (37.5, 6, -28.5),
    ]]
    fillet(fillet4_4_edges, radius=FILLET4_R)
    fillet4_5_edges = [part_2.edges().sort_by_distance(p)[0] for p in [
        (-37.5, 6, 28.5),
        (-37.5, 2.5, 28.5),
    ]]
    fillet(fillet4_5_edges, radius=FILLET4_R)
    fillet4_6_edges = [part_2.edges().sort_by_distance(p)[0] for p in [
        (-23.5, 6, 28.5),
        (-23.5, 2.5, 28.5),
    ]]
    fillet(fillet4_6_edges, radius=FILLET4_R)
    fillet4_7_edges = [part_2.edges().sort_by_distance(p)[0] for p in [
        (23.5, 2.5, 28.5),
        (23.5, 6, 28.5),
    ]]
    fillet(fillet4_7_edges, radius=FILLET4_R)
    fillet4_8_edges = [part_2.edges().sort_by_distance(p)[0] for p in [
        (37.5, 2.5, 28.5),
        (37.5, 6, 28.5),
    ]]
    fillet(fillet4_8_edges, radius=FILLET4_R)

    # Fillet5
    fillet5_edges = [part_2.edges().sort_by_distance(p)[0] for p in [
        (-37.5, 2.5, -44.5),
        (-23.5, 2.5, -44.5),
        (-37.5, 2.5, 44.5),
        (-23.5, 2.5, 44.5),
        (37.5, 2.5, 44.5),
        (23.5, 2.5, 44.5),
        (37.5, 2.5, -44.5),
        (23.5, 2.5, -44.5),
    ]]
    fillet(fillet5_edges, radius=FILLET5_R)

    # Chamfer1
    chamfer1_edges = [part_2.edges().sort_by_distance(p)[0] for p in [
        (-40.525, 7, 20.5),
        (-43, 7, -22.975),
        (43, 7, -22.975),
        (45.475, 7, 20.5),
        (-53, 38, -23.475),
        (-50.025, 38, 20.5),
        (53, 38, -23.475),
        (55.975, 38, 20.5),
    ]]
    chamfer(chamfer1_edges, length=CHAMFER1_SIZE)


solid = part_2.part
